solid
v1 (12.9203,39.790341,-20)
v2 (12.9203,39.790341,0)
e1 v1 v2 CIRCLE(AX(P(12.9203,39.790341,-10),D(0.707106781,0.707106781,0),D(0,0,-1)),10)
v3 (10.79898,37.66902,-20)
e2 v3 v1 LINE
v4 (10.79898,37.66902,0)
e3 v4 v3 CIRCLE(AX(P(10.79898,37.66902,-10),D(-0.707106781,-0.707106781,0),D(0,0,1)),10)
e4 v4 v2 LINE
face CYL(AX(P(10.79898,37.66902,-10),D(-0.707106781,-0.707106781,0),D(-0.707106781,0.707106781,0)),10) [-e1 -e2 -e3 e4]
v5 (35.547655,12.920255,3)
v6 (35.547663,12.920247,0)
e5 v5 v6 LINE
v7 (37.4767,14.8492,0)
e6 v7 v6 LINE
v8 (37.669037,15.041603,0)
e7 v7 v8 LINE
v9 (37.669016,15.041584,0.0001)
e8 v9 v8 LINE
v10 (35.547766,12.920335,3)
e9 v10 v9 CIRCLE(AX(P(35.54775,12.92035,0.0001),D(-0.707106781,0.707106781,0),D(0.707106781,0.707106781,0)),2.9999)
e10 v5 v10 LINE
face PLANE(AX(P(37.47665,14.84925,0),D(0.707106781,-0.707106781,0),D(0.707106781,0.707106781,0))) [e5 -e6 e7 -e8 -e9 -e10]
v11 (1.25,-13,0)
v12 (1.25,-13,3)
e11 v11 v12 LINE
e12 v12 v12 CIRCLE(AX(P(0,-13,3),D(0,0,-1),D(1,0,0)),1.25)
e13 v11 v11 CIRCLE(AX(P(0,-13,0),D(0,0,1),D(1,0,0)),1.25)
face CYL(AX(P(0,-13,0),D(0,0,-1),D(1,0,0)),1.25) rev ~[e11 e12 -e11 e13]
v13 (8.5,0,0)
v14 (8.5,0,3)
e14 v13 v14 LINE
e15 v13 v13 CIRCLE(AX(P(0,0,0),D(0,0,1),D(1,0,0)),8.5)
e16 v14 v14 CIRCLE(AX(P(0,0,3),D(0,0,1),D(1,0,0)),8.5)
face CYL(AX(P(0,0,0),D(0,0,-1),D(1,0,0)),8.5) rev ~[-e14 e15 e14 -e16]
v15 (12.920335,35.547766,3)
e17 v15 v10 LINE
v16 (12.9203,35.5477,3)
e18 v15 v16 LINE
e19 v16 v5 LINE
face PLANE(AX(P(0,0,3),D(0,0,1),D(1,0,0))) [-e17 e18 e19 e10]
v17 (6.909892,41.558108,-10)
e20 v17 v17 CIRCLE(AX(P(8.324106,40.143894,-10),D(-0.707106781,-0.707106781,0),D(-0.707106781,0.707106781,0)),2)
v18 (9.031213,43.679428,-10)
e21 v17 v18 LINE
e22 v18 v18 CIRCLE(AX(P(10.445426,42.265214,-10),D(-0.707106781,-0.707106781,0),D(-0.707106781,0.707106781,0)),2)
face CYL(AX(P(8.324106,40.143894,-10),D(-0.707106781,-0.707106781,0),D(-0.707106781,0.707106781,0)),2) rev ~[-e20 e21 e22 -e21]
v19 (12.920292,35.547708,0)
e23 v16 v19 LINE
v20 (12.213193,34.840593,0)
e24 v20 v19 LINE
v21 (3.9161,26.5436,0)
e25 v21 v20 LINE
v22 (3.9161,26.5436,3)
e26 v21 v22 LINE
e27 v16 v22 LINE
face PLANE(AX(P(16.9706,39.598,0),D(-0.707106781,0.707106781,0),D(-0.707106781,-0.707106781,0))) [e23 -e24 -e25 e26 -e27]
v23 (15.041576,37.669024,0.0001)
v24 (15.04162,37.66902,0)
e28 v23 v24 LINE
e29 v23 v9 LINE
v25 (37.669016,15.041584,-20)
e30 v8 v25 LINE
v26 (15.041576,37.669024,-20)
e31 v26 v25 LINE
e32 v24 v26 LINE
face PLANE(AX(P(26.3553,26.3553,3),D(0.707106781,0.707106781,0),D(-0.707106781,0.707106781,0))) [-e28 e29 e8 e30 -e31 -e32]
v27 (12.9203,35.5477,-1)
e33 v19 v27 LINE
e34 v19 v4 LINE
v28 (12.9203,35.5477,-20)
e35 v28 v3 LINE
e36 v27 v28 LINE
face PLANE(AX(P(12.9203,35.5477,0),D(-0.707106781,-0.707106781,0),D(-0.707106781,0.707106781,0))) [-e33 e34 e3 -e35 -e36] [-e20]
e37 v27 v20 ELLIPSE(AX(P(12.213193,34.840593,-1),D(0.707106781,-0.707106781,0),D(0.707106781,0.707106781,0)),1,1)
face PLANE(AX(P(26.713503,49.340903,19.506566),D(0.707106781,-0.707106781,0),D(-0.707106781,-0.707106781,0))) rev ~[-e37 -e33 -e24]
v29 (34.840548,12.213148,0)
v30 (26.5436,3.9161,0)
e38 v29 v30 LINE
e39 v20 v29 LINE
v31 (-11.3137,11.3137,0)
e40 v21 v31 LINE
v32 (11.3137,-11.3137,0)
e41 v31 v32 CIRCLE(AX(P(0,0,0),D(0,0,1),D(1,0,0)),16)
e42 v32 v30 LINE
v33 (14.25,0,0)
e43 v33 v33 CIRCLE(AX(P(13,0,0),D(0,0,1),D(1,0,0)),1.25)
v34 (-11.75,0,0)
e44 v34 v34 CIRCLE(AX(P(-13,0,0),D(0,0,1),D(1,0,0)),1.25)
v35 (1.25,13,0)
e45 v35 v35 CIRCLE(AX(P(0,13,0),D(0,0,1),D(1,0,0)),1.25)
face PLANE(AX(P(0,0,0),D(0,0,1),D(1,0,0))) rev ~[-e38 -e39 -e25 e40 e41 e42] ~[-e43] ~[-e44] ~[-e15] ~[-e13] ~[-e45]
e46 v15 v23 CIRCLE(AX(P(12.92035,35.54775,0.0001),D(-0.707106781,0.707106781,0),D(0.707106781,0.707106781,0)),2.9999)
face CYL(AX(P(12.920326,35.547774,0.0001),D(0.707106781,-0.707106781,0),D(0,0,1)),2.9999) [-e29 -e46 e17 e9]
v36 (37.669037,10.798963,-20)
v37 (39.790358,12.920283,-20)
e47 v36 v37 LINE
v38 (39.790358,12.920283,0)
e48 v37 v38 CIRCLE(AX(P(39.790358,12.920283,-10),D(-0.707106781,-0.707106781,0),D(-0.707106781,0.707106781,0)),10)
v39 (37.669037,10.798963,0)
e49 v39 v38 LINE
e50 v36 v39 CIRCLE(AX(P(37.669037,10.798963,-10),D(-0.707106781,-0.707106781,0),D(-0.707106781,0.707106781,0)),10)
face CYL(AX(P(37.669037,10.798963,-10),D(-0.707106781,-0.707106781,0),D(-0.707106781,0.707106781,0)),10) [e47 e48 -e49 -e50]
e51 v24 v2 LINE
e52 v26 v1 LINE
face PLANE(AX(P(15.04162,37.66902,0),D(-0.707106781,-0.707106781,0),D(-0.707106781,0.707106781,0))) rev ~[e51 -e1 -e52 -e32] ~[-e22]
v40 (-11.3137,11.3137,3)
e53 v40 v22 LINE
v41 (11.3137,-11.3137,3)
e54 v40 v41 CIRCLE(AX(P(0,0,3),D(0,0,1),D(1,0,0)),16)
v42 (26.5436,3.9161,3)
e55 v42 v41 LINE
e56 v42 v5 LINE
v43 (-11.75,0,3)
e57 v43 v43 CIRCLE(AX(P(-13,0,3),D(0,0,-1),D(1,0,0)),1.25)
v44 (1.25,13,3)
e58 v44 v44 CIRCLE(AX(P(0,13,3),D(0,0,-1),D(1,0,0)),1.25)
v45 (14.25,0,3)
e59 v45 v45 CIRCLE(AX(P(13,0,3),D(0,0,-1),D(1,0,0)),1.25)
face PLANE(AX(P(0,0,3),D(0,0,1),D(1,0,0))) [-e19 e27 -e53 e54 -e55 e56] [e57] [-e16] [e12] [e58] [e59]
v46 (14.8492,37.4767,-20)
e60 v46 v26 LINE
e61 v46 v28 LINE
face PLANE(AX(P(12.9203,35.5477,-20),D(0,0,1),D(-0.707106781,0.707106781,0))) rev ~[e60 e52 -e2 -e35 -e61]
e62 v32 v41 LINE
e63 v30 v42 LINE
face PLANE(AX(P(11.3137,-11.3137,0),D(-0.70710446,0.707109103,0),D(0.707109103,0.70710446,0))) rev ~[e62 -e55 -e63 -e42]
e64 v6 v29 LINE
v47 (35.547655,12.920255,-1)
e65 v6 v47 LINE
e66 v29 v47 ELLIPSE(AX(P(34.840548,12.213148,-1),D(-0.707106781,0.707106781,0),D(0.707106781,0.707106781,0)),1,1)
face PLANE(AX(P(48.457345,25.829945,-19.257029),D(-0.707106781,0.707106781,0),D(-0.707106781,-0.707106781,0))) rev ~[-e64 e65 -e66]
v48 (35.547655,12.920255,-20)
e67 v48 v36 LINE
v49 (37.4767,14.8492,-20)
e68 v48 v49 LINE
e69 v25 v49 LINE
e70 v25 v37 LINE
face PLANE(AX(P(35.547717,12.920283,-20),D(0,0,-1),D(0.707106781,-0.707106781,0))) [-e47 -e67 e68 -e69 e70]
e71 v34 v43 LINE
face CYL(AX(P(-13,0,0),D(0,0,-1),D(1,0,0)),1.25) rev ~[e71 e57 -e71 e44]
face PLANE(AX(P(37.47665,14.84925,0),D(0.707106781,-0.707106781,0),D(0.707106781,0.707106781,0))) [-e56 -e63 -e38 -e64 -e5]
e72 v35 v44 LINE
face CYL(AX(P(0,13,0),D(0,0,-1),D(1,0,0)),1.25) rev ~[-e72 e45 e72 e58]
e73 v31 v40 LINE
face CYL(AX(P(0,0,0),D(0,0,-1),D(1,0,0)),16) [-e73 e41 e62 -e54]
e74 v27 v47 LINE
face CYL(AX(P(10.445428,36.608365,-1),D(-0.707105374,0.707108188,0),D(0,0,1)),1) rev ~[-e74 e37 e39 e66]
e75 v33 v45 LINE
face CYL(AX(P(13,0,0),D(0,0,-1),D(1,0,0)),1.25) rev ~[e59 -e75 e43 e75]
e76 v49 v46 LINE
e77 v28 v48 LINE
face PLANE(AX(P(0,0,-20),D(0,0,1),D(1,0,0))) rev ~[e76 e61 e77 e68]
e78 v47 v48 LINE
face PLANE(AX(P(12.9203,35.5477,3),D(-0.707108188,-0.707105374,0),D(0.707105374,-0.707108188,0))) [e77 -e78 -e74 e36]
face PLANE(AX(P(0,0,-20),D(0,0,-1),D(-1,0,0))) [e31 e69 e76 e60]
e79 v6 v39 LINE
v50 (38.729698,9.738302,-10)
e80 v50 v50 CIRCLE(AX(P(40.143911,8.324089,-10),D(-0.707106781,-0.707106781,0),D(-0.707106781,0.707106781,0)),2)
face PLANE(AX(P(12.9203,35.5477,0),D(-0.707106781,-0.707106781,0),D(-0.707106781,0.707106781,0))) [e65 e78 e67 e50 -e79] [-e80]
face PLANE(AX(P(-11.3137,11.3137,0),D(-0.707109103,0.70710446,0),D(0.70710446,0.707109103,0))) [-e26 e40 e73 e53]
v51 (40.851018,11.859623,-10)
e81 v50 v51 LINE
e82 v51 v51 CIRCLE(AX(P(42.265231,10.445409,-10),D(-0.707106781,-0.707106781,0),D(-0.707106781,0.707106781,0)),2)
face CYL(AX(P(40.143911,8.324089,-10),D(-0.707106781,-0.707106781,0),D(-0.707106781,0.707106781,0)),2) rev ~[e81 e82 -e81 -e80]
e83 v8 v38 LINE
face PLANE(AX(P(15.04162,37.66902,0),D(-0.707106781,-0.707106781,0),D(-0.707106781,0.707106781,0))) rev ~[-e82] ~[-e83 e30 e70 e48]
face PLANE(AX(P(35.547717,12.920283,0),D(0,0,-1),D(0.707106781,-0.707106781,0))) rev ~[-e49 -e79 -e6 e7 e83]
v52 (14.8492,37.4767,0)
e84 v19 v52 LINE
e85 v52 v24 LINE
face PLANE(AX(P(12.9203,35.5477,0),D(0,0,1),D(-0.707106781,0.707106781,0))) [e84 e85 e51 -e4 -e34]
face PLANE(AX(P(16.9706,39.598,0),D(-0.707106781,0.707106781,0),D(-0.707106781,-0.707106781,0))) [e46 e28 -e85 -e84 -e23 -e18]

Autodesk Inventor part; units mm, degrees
ref_plane "YZ Plane" through (0, 0, 0) normal (1, 0, 0) x (0, 1, 0)
ref_plane "XZ Plane" through (0, 0, 0) normal (0, 1, 0) x (-1, 0, 0)
ref_plane "XY Plane" through (0, 0, 0) normal (0, 0, 1) x (1, 0, 0)
sketch "Sketch1" plane through (0, 0, 0) normal (0, 0, 1) x (1, 0, 0)
  circle A0 centre (0, 0) radius 16 projected
  circle A1 centre (-13, 0) radius 1.25 projected
  circle A2 centre (0, -13) radius 1.25 projected
  circle A3 centre (13, 0) radius 1.25 projected
  circle A4 centre (0, 13) radius 1.25 projected
  circle A5 centre (0, 0) radius 8.5 projected
  line L0 (-13, 0) -> (0, -13)
  line L1 (0, -13) -> (13, 0)
  line L2 (13, 0) -> (0, 13)
  line L3 (0, 13) -> (-13, 0)
  circle A6 centre (0, 0) radius 16
  line L4 (-11.3137, 11.3137) -> (3.9161, 26.5436)
  line L5 (11.3137, -11.3137) -> (26.5436, 3.9161)
  line L6 (11.3137, 11.3137) -> (-3.2223, 25.8497)
  line L7 (-3.2223, 25.8497) -> (25.9716, -3.3441)
  line L8 (0, 22.6274) -> (10.6066, 33.234)
  line L9 (22.6274, 0) -> (33.234, 10.6066)
  line L10 (33.234, 10.6066) -> (10.6066, 33.234)
  point P0 (0, 0)
  dimension "d0" = 15
  dimension "d1" = 15
extrude "Extrusion1" add sketch "Sketch1" along normal blind 3 contours A0 | A0 L7 L5 | A0 L4 L6 | L6 L4 L8 L10 L9 L5 L7 | A1 L3 A4 L2 A3 L1 A2 L0
sketch "Sketch2" plane through (0, 0, 3) normal (0, 0, 1) x (1, 0, 0)
  line L0 (10.6066, 33.234) -> (-11.3137, 11.3137) projected
  arc A0 (-11.3137, 11.3137) -> (11.3137, -11.3137) centre (0, 0) ccw projected
  line L1 (11.3137, -11.3137) -> (33.234, 10.6066) projected
  line L2 (33.234, 10.6066) -> (10.6066, 33.234) projected
  circle A1 centre (13, 0) radius 1.25 projected
  circle A2 centre (0, -13) radius 1.25 projected
  circle A3 centre (-13, 0) radius 1.25 projected
  circle A4 centre (0, 0) radius 8.5 projected
  circle A5 centre (0, 13) radius 1.25 projected
  circle A6 centre (-13, 0) radius 1.25 projected
  circle A7 centre (0, 13) radius 1.25 projected
  line L3 (-13, 0) -> (0, 13)
  circle A8 centre (0, -13) radius 1.25 projected
  circle A9 centre (13, 0) radius 1.25 projected
  line L4 (0, -13) -> (13, 0)
  circle A10 centre (0, 0) radius 8.5 projected
  line L5 (0, 0) -> (28.2843, 28.2843)
  line L6 (-13, 0) -> (0, -13)
  line L7 (33.234, 10.6066) -> (10.6066, 33.234) projected
  line L8 (10.6066, 33.234) -> (35.7367, 58.3641)
  line L9 (33.234, 10.6066) -> (59.3246, 36.6972)
  line L10 (11.3137, -11.3137) -> (33.234, 10.6066) projected
  line L11 (10.6066, 33.234) -> (-11.3137, 11.3137) projected
  line L12 (28.2843, 28.2843) -> (39.598, 16.9706)
  line L13 (28.2843, 28.2843) -> (16.9706, 39.598)
  point P0 (0, 0)
  dimension "d4" = 40
extrude "Extrusion2" add sketch "Sketch2" against normal up to surface (3 mm away) contours L8 L13 L5 L2 | L5 L12 L9 L2
sketch "Sketch3" plane through (0, 0, 0) normal (0, 0, -1) x (-1, 0, 0)
  line L0 (-16.9706, 39.598) -> (11.3137, 11.3137) projected
  line L1 (-16.9706, 39.598) -> (-39.598, 16.9706) projected
  line L2 (-11.3137, -11.3137) -> (-39.598, 16.9706) projected
  arc A0 (-11.3137, -11.3137) -> (11.3137, 11.3137) centre (0, 0) ccw projected
  circle A1 centre (-13, 0) radius 1.25 projected
  circle A2 centre (0, -13) radius 1.25 projected
  circle A3 centre (13, 0) radius 1.25 projected
  circle A4 centre (0, 0) radius 8.5 projected
  circle A5 centre (0, 13) radius 1.25 projected
  line L3 (-11.3137, -11.3137) -> (-39.598, 16.9706) projected
  line L4 (-39.598, 16.9706) -> (-37.4767, 14.8492)
  line L5 (-37.4767, 14.8492) -> (-14.8492, 37.4767)
  line L6 (-16.9706, 39.598) -> (11.3137, 11.3137) projected
  point P0 (0, 0)
  dimension "d7" = 3
extrude "Extrusion3" add sketch "Sketch3" along normal blind 20 contours L0 L5 L2 L1
sketch "Sketch4" plane through (39.598, 16.9706, -20) normal (0.7071068, 0.7071068, 0) x (-0.7071068, 0.7071068, 0)
  line L0 (0, 23) -> (0, 0) projected
  line L1 (32, 0) -> (0, 0) projected
  line L2 (32, 23) -> (32, 0) projected
  line L3 (32, 20) -> (32, 0) projected
  line L4 (32, 0) -> (35, 0)
  line L5 (35, 0) -> (35, 20)
  line L6 (35, 20) -> (32, 20)
  line L7 (32, 20) -> (32, 0)
  line L8 (0, 20) -> (0, 0) projected
  line L9 (0, 0) -> (-3, 0)
  line L10 (-3, 0) -> (-3, 20)
  line L11 (-3, 20) -> (0, 20)
  line L12 (0, 20) -> (0, 0)
  circle A0 centre (35, 10) radius 10
  circle A1 centre (-3, 10) radius 10
  line L13 (35, 10) -> (45, 10)
  circle A2 centre (40, 10) radius 2
  line L14 (16, 20) -> (16, 0)
  line L15 (0, 0) -> (32, 0) projected
  circle A3 centre (16, 10) radius 2
  circle A4 centre (-8, 10) radius 2
  line L16 (0, 23) -> (32, 23) projected
  point P0 (32, 19)
  point P1 (-3, 0)
  point P2 (35, 0)
  dimension "d12" = 3
  dimension "d13" = 3
  dimension "d14" = 4
  dimension "d15" = 4
extrude "Extrusion4" add sketch "Sketch4" against normal blind 3 contours L0 A1 L11 | L0 A1 L10 | L10 A1 | L6 A0 L2 | L0 L9 A1 | A0 L5 L2 | A0 L13 A2 L5 | A0 L4 L2 | L13 A2 A0 L5
sketch "Sketch5" plane through (12.7279, 39.598, -10) normal (-0.7071068, -0.7071068, 0) x (-0.7071068, 0.7071068, 0)
  circle A0 centre (-43, 0) radius 2 projected
  circle A1 centre (5, 0) radius 2 projected
  line L0 (-3, -10) -> (0, -10) projected
  arc A2 (0, -10) -> (0, 10) centre (0, 0) ccw projected
  line L1 (0, 10) -> (-38, 10) projected
  arc A3 (-38, 10) -> (-38, -10) centre (-38, 0) ccw projected
  line L2 (-38, -10) -> (-35, -10) projected
  circle A4 centre (-41.5, 29.4965) radius 2.25 projected
  circle A5 centre (3.5, 29.4965) radius 2.25 projected
  line L3 (-41.5, 29.4965) -> (-41.5, -27.5248)
  line L4 (3.5, 29.4965) -> (3.5, -58.5312)
  circle A6 centre (-41.5, 0) radius 2
  circle A7 centre (3.5, 0) radius 2
  line L5 (-3, -10) -> (-35, -10) projected
  point P0 (-19, -10)
  point P1 (4.25, 1.854)
  point P2 (4.25, -1.854)
  point P3 (-42.25, -1.854)
  point P4 (-42.25, 1.854)
extrude "Extrusion5" add sketch "Sketch5" against normal blind 3 contours A6 A0 | A1 A7
sketch "Sketch6" plane through (12.7279, 39.598, -10) normal (-0.7071068, -0.7071068, 0) x (-0.7071068, 0.7071068, 0)
  arc A0 (-42.25, -1.854) -> (-42.25, 1.854) centre (-43, 0) ccw projected
  arc A1 (-42.25, 1.854) -> (-42.25, -1.854) centre (-41.5, 0) ccw projected
  arc A2 (4.25, 1.854) -> (4.25, -1.854) centre (5, 0) ccw projected
  arc A3 (4.25, -1.854) -> (4.25, 1.854) centre (3.5, 0) ccw projected
  line L0 (-3, -10) -> (0, -10) projected
  arc A4 (0, -10) -> (0, 10) centre (0, 0) ccw projected
  line L1 (0, 10) -> (-38, 10) projected
  arc A5 (-38, 10) -> (-38, -10) centre (-38, 0) ccw projected
  line L2 (-38, -10) -> (-35, -10) projected
  circle A6 centre (-41.5, 0) radius 2
  circle A7 centre (3.5, 0) radius 2
  line L3 (-3, -10) -> (-35, -10) projected
  point P0 (-19, -10)
  point P1 (-42.25, -1.854)
  point P2 (-42.25, 1.854)
  point P3 (4.25, 1.854)
extrude "Extrusion6" cut sketch "Sketch6" against normal blind 3 contours A1 A0 | A3 A2
sketch "Sketch8" plane through (0, 0, 3) normal (0, 0, 1) x (1, 0, 0)
  line L0 (16.9706, 39.598) -> (-11.3137, 11.3137) projected
  arc A0 (-11.3137, 11.3137) -> (11.3137, -11.3137) centre (0, 0) ccw projected
  line L1 (11.3137, -11.3137) -> (39.598, 16.9706) projected
  line L2 (39.598, 16.9706) -> (16.9706, 39.598) projected
  circle A1 centre (13, 0) radius 1.25 projected
  circle A2 centre (0, -13) radius 1.25 projected
  circle A3 centre (-13, 0) radius 1.25 projected
  circle A4 centre (0, 0) radius 8.5 projected
  circle A5 centre (0, 13) radius 1.25 projected
  circle A6 centre (-13, 0) radius 1.25 projected
  circle A7 centre (0, 13) radius 1.25 projected
  line L3 (-13, 0) -> (0, 13)
  circle A8 centre (13, 0) radius 1.25 projected
  line L4 (0, 13) -> (13, 0)
  line L5 (13, 0) -> (-0.0002, -13.0002)
  line L6 (0, 0) -> (26.3553, 26.3553)
  line L7 (26.3553, 26.3553) -> (50.7309, 1.9797)
  line L8 (14.8492, 37.4767) -> (37.4767, 14.8492) projected
  line L9 (26.3553, 26.3553) -> (4.9031, 47.8075)
  line L10 (5.6569, 46.669) -> (12.7279, 39.598) projected
  line L11 (14.8492, 37.4767) -> (20.1327, 42.7601)
  line L12 (20.1327, 42.7601) -> (7.1248, 51.3664)
  line L13 (7.1248, 51.3664) -> (0, 48.1905)
  line L14 (0, 48.1905) -> (14.8492, 37.4767)
  line L15 (11.3137, -11.3137) -> (37.4767, 14.8492) projected
  line L16 (37.4767, 14.8492) -> (41.6279, 19.0005)
  line L17 (41.6279, 19.0005) -> (52.2205, 8.9599)
  line L18 (52.2205, 8.9599) -> (46.7077, 4.5581)
  line L19 (46.7077, 4.5581) -> (37.4767, 13.3081)
  line L20 (37.4767, 13.3081) -> (37.4767, 14.8492)
  line L21 (11.3137, -11.3137) -> (39.598, 16.9706) projected
  point P0 (0, 0)
  point P1 (15.0416, 37.669)
  point P2 (37.669, 15.0416)
  dimension "d24" = 37.272
extrude "Extrusion7" cut sketch "Sketch8" against normal through all contours L14 L13 L12 L11 L0 | L0 L2 L1 L7 L9 | L1 L7 L18 L19 L20 | L16 L17 L18 L7 L1
sketch "Sketch9" plane through (0, 0, 3) normal (0, 0, 1) x (1, 0, 0)
  circle A0 centre (0, 13) radius 1.25 projected
  circle A1 centre (0, 0) radius 8.5 projected
  circle A2 centre (-13, 0) radius 1.25 projected
  circle A3 centre (0, -13) radius 1.25 projected
  circle A4 centre (13, 0) radius 1.25 projected
  line L0 (37.669, 15.0416) -> (15.0416, 37.669) projected
  line L1 (15.0416, 37.669) -> (-11.3137, 11.3137) projected
  arc A5 (-11.3137, 11.3137) -> (11.3137, -11.3137) centre (0, 0) ccw projected
  line L2 (11.3137, -11.3137) -> (37.669, 15.0416) projected
  line L3 (37.669, 15.0416) -> (15.0416, 37.669) projected
  line L4 (15.0416, 37.669) -> (12.9203, 35.5477)
  line L5 (15.0416, 37.669) -> (-11.3137, 11.3137) projected
  line L6 (12.9203, 35.5477) -> (38.0462, 10.4217)
  point P0 (0, 0)
  point P1 (35.5477, 12.9203)
  dimension "d27" = 3
extrude "Extrusion8" add sketch "Sketch9" against normal up to surface (23 mm away) contours L2 L6 L1 L0
sketch "Sketch10" plane through (12.9203, 35.5477, 0) normal (-0.7071068, -0.7071068, 0) x (-0.7071068, 0.7071068, 0)
  circle A0 centre (6.5, 39.4965) radius 2 projected
  circle A1 centre (6.5, 10) radius 2 projected
  circle A2 centre (-38.5, 10) radius 2 projected
  line L0 (0, 0) -> (-32, 0) projected
  line L1 (0, 0) -> (0, 20) projected
  line L2 (0, 20) -> (-32, 20) projected
  line L3 (-32, 0) -> (-32, 20) projected
  line L4 (-32, 49.4965) -> (-35, 49.4965) projected
  line L5 (-32, 29.4965) -> (-32, 49.4965) projected
  line L6 (-35, 29.4965) -> (-32, 29.4965) projected
  arc A3 (-35, 49.4965) -> (-35, 29.4965) centre (-35, 39.4965) ccw projected
  circle A4 centre (-38.5, 39.4965) radius 2.25 projected
  line L7 (0, 29.4965) -> (3, 29.4965) projected
  line L8 (0, 49.4965) -> (0, 29.4965) projected
  line L9 (3, 49.4965) -> (0, 49.4965) projected
  arc A5 (3, 29.4965) -> (3, 49.4965) centre (3, 39.4965) ccw projected
  circle A6 centre (6.5, 39.4965) radius 2.25 projected
  circle A7 centre (3, 10) radius 10
  line L10 (0, 20) -> (-32, 20) projected
  line L11 (0, 20) -> (3, 20)
  line L12 (0, 0) -> (-32, 0) projected
  line L13 (0, 0) -> (3, 0)
  line L14 (-16, 20) -> (-16, 12.7343)
  circle A8 centre (-38.5, 10) radius 2
  circle A9 centre (-35, 10) radius 10
  line L15 (-32, 20) -> (-35, 20)
  line L16 (-32, 0) -> (-35, 0)
  point P0 (-16, 0)
extrude "Extrusion9" add sketch "Sketch10" against normal blind 3 contours L1 A7 L13 | L16 A9 L3 | L1 A7 | A9 L3 | L1 L11 A7 | A9 L15 L3 picked at (1.5, 10) picked at (-33.5, 10)
fillet "Fillet4" radius 3 1 edges at (26.3553, 26.3553, 3)
fillet "Fillet5" radius 1 1 edges at (24.234, 24.234, 0)
properties part number "Uchwyt_silnika_1"
